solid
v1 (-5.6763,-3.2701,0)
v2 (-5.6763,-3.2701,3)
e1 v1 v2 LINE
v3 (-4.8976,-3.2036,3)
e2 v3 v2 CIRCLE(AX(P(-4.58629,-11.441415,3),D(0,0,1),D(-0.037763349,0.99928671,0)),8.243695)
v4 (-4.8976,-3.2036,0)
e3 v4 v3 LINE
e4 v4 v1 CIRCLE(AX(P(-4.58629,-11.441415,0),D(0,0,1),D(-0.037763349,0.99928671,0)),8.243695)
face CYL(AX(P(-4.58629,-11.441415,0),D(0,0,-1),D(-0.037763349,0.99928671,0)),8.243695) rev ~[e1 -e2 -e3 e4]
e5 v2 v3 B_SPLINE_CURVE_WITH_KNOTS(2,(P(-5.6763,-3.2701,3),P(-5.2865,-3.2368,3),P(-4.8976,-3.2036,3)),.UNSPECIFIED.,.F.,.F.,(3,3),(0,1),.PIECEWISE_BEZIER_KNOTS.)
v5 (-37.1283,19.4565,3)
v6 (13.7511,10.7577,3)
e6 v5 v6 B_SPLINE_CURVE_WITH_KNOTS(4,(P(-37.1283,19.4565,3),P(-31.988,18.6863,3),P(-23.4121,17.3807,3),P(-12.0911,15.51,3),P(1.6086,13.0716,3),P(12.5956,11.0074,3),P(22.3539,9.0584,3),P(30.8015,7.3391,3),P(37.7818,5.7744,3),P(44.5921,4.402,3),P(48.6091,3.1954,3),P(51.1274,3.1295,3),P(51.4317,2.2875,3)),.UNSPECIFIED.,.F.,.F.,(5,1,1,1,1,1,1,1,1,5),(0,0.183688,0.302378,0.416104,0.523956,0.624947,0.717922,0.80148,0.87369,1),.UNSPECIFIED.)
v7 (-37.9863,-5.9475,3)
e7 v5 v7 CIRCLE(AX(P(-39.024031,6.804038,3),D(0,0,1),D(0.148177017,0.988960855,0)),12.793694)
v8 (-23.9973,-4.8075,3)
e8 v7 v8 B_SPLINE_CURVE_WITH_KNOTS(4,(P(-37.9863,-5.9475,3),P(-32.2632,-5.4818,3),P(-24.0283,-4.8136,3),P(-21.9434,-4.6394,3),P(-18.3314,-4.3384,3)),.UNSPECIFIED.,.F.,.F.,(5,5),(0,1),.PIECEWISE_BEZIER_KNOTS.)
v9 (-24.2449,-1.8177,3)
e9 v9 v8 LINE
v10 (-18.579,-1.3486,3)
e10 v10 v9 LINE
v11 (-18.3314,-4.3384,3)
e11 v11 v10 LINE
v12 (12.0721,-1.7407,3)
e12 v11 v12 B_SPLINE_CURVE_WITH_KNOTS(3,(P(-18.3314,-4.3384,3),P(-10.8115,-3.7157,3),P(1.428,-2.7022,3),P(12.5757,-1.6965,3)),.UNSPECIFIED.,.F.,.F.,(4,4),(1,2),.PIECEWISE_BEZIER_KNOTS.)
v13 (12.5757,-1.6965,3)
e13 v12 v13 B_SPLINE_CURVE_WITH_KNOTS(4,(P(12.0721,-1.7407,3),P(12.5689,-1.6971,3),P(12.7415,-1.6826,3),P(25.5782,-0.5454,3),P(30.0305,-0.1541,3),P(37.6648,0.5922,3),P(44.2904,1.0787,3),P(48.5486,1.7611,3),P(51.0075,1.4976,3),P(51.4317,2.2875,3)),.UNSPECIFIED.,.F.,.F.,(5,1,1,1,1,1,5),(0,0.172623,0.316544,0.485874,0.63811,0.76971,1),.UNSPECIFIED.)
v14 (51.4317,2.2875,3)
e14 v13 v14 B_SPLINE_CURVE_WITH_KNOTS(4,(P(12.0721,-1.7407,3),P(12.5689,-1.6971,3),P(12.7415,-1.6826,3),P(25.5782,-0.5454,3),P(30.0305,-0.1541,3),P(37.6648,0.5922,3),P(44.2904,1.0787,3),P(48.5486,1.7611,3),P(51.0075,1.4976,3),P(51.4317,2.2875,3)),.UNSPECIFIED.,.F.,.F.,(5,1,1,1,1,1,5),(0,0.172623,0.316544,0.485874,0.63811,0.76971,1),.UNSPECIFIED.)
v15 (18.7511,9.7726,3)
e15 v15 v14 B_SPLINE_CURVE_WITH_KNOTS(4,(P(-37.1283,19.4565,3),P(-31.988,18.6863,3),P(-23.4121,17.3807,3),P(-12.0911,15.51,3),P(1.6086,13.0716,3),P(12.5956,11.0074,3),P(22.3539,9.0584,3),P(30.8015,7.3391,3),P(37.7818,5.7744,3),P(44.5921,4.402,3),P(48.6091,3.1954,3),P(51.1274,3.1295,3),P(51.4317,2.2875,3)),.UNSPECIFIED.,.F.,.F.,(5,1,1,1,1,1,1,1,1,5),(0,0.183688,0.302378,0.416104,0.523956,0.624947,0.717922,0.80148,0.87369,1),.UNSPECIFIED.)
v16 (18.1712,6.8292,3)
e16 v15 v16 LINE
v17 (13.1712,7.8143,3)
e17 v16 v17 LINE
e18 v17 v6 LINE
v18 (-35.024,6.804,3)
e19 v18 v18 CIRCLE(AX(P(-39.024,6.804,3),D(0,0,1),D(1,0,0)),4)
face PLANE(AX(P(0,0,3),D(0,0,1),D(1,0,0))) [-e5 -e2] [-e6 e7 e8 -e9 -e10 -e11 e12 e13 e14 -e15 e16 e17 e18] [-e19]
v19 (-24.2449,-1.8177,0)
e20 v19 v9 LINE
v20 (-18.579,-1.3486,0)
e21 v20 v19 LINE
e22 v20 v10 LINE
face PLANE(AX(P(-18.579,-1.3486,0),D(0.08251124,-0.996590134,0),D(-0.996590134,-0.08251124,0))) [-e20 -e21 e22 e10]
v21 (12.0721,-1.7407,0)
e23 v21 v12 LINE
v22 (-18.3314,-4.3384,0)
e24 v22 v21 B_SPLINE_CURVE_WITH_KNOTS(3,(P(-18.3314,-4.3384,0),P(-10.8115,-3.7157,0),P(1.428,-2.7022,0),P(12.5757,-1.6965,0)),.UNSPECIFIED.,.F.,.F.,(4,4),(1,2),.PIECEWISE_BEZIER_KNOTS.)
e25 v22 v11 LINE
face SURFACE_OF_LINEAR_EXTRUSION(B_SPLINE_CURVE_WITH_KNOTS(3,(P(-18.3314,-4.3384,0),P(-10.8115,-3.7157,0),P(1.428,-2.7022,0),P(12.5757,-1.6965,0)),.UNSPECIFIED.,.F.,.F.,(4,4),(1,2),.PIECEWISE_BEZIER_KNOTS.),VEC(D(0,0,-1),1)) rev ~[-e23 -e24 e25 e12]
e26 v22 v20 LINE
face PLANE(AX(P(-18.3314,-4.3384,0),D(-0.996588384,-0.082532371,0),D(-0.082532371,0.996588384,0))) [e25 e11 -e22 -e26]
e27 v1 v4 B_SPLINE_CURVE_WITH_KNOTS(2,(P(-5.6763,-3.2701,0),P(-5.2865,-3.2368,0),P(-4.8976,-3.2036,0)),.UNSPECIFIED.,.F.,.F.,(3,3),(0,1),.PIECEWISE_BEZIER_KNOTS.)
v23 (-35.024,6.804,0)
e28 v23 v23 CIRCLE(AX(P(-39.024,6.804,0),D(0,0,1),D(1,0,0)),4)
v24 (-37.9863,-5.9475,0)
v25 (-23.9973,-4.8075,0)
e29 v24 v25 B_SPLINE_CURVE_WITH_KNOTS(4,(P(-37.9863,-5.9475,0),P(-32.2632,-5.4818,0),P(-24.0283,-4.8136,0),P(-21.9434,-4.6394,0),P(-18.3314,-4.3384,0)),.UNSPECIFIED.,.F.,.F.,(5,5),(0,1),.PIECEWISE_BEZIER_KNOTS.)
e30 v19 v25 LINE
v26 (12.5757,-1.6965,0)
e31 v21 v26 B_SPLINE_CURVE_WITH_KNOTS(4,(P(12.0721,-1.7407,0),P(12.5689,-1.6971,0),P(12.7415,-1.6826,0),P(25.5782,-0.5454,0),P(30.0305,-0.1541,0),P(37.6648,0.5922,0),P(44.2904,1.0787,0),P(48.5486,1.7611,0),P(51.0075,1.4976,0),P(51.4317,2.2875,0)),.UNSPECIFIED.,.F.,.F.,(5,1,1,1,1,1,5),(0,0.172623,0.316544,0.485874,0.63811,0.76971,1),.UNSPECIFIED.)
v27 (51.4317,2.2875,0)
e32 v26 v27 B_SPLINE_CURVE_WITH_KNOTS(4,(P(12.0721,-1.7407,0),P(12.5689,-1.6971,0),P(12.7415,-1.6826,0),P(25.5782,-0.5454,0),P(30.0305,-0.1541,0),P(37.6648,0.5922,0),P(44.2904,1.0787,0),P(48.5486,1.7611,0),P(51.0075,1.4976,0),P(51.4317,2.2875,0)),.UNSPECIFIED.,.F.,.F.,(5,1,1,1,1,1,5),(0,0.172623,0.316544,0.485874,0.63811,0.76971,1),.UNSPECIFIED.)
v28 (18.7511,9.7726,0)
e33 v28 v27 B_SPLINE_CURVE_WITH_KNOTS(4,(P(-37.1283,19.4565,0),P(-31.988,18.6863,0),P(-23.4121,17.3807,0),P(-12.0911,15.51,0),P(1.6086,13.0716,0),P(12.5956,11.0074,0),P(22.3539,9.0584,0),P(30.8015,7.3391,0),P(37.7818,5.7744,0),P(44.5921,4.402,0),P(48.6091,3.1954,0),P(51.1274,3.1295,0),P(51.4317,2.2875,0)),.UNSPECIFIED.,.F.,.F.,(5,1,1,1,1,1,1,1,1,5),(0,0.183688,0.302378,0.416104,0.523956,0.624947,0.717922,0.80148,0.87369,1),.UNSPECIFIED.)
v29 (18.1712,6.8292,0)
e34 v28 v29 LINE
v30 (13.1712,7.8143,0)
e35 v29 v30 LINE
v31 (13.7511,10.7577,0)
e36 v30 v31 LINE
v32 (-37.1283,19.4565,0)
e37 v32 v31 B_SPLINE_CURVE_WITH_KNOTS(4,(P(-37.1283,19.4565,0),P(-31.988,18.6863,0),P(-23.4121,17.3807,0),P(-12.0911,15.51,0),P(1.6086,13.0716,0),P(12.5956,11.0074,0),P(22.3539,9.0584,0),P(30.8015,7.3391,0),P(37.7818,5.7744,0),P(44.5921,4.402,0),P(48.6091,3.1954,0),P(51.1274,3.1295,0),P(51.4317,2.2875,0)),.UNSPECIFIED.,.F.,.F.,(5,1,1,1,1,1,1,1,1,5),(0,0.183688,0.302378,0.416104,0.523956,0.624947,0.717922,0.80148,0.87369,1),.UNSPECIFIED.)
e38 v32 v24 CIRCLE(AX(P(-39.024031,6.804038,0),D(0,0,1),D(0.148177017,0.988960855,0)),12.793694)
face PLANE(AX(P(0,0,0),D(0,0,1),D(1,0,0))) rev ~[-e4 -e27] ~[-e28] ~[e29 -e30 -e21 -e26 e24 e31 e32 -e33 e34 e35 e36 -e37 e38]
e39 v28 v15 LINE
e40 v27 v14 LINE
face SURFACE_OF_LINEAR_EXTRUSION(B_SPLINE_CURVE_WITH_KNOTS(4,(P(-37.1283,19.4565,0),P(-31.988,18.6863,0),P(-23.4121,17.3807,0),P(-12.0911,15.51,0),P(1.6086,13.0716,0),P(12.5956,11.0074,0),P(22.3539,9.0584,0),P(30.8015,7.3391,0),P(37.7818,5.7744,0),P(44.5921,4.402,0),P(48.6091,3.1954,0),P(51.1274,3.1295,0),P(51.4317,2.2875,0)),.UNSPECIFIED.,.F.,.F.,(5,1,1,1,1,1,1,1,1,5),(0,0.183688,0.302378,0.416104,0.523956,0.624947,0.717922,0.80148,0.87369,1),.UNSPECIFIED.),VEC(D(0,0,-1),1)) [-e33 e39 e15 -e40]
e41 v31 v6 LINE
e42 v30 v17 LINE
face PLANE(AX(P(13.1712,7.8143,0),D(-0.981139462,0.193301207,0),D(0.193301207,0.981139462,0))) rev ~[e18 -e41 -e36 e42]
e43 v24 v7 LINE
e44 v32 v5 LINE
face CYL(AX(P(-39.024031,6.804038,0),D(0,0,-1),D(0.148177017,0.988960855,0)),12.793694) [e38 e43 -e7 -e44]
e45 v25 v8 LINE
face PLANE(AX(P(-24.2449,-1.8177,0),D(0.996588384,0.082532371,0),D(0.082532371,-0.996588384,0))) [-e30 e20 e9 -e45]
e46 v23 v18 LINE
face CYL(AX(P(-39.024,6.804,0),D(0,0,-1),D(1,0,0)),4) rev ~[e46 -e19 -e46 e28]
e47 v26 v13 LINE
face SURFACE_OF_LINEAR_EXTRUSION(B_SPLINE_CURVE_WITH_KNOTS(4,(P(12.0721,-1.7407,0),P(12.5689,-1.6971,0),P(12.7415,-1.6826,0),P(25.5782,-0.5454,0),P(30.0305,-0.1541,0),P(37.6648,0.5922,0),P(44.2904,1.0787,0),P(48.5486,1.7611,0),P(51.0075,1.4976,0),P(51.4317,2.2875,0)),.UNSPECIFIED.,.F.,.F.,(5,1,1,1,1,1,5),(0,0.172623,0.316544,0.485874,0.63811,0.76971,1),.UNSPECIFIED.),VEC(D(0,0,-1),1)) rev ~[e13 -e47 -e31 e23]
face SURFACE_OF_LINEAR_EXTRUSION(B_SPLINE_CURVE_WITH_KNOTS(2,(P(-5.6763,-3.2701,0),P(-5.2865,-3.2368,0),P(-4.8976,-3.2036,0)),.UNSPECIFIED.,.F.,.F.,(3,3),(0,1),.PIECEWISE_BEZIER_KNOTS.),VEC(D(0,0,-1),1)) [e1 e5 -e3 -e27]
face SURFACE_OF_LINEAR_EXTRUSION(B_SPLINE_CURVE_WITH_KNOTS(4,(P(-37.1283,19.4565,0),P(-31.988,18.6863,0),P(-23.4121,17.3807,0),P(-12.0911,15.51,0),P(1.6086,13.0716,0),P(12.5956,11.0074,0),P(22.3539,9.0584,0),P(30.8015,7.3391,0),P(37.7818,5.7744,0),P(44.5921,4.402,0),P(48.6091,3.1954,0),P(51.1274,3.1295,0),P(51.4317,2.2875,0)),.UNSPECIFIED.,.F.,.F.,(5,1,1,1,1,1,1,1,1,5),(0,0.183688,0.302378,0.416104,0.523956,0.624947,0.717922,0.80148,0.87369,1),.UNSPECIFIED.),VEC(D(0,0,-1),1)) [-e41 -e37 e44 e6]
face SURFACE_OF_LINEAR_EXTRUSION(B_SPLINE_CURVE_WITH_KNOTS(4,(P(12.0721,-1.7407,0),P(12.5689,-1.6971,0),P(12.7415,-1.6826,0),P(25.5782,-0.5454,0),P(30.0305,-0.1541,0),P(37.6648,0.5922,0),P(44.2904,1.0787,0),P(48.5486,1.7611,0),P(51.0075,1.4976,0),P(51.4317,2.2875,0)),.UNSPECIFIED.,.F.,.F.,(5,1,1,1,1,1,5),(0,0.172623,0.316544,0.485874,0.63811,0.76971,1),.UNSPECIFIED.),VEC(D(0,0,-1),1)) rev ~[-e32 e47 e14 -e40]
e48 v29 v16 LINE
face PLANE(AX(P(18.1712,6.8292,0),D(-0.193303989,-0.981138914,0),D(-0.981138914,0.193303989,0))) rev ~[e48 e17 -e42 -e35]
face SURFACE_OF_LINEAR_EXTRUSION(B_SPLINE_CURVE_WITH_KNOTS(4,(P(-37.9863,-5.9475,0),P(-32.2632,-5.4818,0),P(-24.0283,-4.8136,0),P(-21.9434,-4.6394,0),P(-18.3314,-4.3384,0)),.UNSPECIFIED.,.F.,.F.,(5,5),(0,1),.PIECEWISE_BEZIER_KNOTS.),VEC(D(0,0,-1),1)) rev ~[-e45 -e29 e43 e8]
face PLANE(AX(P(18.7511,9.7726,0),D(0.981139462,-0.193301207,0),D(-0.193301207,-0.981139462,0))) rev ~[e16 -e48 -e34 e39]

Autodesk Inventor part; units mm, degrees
ref_plane "YZ Plane" through (0, 0, 0) normal (1, 0, 0) x (0, 1, 0)
ref_plane "XZ Plane" through (0, 0, 0) normal (0, 1, 0) x (-1, 0, 0)
ref_plane "XY Plane" through (0, 0, 0) normal (0, 0, 1) x (1, 0, 0)
sketch "Sketch1" plane through (0, 0, 0) normal (0, 0, 1) x (1, 0, 0)
  line L0 (13.1712, 7.8143) -> (13.7511, 10.7577)
  line L1 (18.1712, 6.8292) -> (13.1712, 7.8143)
  line L2 (18.7511, 9.7726) -> (18.1712, 6.8292)
  line L3 (13.7511, 10.7577) -> (18.7511, 9.7726)
  spline S0 degree 4 poles (-37.1283, 19.4565) (-31.988, 18.6863) (-23.4121, 17.3807) (-12.0911, 15.51) (1.6086, 13.0716) (12.5956, 11.0074) (22.3539, 9.0584) (30.8015, 7.3391) (37.7818, 5.7744) (44.5921, 4.402) (48.6091, 3.1954) (51.1274, 3.1295) (51.4317, 2.2875) knots 0 0 0 0 0 0.183688 0.302378 0.416104 0.523956 0.624947 0.717922 0.80148 0.87369 1 1 1 1 1
  spline S1 degree 2 poles (-25.5579, 11.4472) (-25.4492, 11.4311) (-25.3406, 11.415) knots 0 0 0 1 1 1
  line L4 (-25.3627, 11.4183) -> (-25.3184, 11.4117) construction
  arc A0 (-25.3228, 11.4123) -> (-25.3583, 11.4176) centre (-40.9202, -93.4089) ccw construction
  line L5 (-18.3314, -4.3384) -> (-18.579, -1.3486)
  line L6 (-18.579, -1.3486) -> (-24.2449, -1.8177)
  line L7 (-24.2449, -1.8177) -> (-23.9973, -4.8075)
  line L8 (-23.9973, -4.8075) -> (-18.3314, -4.3384)
  arc A1 (-37.1283, 19.4565) -> (-37.9863, -5.9475) centre (-39.024, 6.804) ccw
  circle A2 centre (-39.024, 6.804) radius 4
  arc A3 (-4.8976, -3.2036) -> (-5.6763, -3.2701) centre (-4.5845, -11.4705) ccw
  line L9 (-20.3196, -4.5041) -> (-16.3432, -4.1726) construction
  arc A4 (-16.7409, -4.2059) -> (-19.922, -4.4711) centre (806.8876, -9970.2309) ccw construction
  spline S2 degree 4 poles (-37.9863, -5.9475) (-32.2632, -5.4818) (-24.0283, -4.8136) (-21.9434, -4.6394) (-18.3314, -4.3384) knots 0 0 0 0 0 1 1 1 1 1
  line L10 (-4.9769, -3.2104) -> (-4.8183, -3.1968) construction
  arc A5 (-4.9611, -3.209) -> (-4.8341, -3.1982) centre (-409.3906, 4736.1469) ccw construction
  spline S3 degree 2 poles (-5.6763, -3.2701) (-5.2865, -3.2368) (-4.8976, -3.2036) knots 0 0 0 1 1 1
  spline S4 degree 4 poles (12.0721, -1.7407) (12.5689, -1.6971) (12.7415, -1.6826) (25.5782, -0.5454) (30.0305, -0.1541) (37.6648, 0.5922) (44.2904, 1.0787) (48.5486, 1.7611) (51.0075, 1.4976) (51.4317, 2.2875) knots 0 0 0 0 0 0.172623 0.316544 0.485874 0.63811 0.76971 1 1 1 1 1
  line L11 (7.463, -2.1449) -> (16.6812, -1.3365) construction
  arc A6 (15.7599, -1.4238) -> (8.3854, -2.0706) centre (103.7869, -1047.5009) ccw construction
  line L12 (-18.3314, -4.3384) -> (-10.8115, -3.7157) construction
  line L13 (-10.8115, -3.7157) -> (1.428, -2.7022) construction
  line L14 (1.428, -2.7022) -> (12.5757, -1.6965) construction
  spline S5 degree 3 poles (-18.3314, -4.3384) (-10.8115, -3.7157) (1.428, -2.7022) (12.5757, -1.6965) knots 1 1 1 1 2 2 2 2
  point P0 (0, 0)
  point P1 (15.4403, -7.1521)
  point P2 (-2.5033, 3.2923)
  point P3 (-23.1393, 17.2995)
  point P4 (-9.9873, 15.1095)
  point P5 (2.1777, 12.9435)
  point P6 (13.2327, 10.8585)
  point P7 (23.0577, 8.9085)
  point P8 (31.5477, 7.1475)
  point P9 (38.6187, 5.6235)
  point P10 (44.1927, 4.3875)
  point P11 (48.2187, 3.4755)
  point P12 (50.6487, 2.9175)
  point P13 (-10.8115, -3.7157)
  point P14 (1.428, -2.7022)
  point P15 (31.1217, -0.0405)
  point P16 (38.3097, 0.6165)
  point P17 (43.9857, 1.1445)
  point P18 (48.0897, 1.5315)
  point P19 (50.5707, 1.7685)
  point P20 (-51.8103, 7.2396)
  point P21 (51.4317, 2.7285)
  point P22 (-51.8103, 21.5235)
  point P23 (-52.6203, -7.1085)
  point P24 (51.4317, 1.8465)
  point P25 (-37.1283, 6.7894)
  point P26 (-23.1393, 6.2818)
  point P27 (-9.9873, 5.7367)
  point P28 (2.1777, 5.1731)
  point P29 (13.2327, 4.61)
  point P30 (23.0577, 4.0701)
  point P31 (31.5477, 3.573)
  point P32 (38.6187, 3.1344)
  point P33 (44.1927, 2.7757)
  point P34 (48.2187, 2.5096)
  point P35 (50.6487, 2.3465)
  point P36 (-25.9011, 1.2856)
  point P37 (9.8661, 4.5796)
  point P38 (-19.9623, 10.5844)
  point P39 (-14.7015, 9.7084)
  point P40 (-9.8355, 8.842)
  point P41 (-5.4135, 8.008)
  point P42 (-1.4835, 7.228)
  point P43 (1.9125, 6.5236)
  point P44 (4.7409, 5.914)
  point P45 (6.9705, 5.4196)
  point P46 (8.5809, 5.0548)
  point P47 (9.5529, 4.8316)
  point P48 (-20.3055, 1.7416)
  point P49 (-15.0315, 2.182)
  point P50 (-10.1367, 2.5996)
  point P51 (-5.6763, 2.986)
  point P52 (-1.7019, 3.3376)
  point P53 (1.7421, 3.6484)
  point P54 (4.6173, 3.9112)
  point P55 (6.8877, 4.1224)
  point P56 (8.5293, 4.2772)
  point P57 (9.5217, 4.372)
  point P58 (12.0721, -1.7407)
  dimension "d0" = 3
  dimension "d1" = 5
  dimension "d2" = 52.7751
  dimension "d3" = 3
  dimension "d4" = 5.6658
  dimension "d5" = 8
extrude "Extrusion1" add sketch "Sketch1" along normal blind 3 contours L1 L2 S0 S4 S5 L5 L6 L7 S2 A1 L0
properties part number "2P.03.01.10.IM.AileronRibEnd" material "Wood (Walnut)"
